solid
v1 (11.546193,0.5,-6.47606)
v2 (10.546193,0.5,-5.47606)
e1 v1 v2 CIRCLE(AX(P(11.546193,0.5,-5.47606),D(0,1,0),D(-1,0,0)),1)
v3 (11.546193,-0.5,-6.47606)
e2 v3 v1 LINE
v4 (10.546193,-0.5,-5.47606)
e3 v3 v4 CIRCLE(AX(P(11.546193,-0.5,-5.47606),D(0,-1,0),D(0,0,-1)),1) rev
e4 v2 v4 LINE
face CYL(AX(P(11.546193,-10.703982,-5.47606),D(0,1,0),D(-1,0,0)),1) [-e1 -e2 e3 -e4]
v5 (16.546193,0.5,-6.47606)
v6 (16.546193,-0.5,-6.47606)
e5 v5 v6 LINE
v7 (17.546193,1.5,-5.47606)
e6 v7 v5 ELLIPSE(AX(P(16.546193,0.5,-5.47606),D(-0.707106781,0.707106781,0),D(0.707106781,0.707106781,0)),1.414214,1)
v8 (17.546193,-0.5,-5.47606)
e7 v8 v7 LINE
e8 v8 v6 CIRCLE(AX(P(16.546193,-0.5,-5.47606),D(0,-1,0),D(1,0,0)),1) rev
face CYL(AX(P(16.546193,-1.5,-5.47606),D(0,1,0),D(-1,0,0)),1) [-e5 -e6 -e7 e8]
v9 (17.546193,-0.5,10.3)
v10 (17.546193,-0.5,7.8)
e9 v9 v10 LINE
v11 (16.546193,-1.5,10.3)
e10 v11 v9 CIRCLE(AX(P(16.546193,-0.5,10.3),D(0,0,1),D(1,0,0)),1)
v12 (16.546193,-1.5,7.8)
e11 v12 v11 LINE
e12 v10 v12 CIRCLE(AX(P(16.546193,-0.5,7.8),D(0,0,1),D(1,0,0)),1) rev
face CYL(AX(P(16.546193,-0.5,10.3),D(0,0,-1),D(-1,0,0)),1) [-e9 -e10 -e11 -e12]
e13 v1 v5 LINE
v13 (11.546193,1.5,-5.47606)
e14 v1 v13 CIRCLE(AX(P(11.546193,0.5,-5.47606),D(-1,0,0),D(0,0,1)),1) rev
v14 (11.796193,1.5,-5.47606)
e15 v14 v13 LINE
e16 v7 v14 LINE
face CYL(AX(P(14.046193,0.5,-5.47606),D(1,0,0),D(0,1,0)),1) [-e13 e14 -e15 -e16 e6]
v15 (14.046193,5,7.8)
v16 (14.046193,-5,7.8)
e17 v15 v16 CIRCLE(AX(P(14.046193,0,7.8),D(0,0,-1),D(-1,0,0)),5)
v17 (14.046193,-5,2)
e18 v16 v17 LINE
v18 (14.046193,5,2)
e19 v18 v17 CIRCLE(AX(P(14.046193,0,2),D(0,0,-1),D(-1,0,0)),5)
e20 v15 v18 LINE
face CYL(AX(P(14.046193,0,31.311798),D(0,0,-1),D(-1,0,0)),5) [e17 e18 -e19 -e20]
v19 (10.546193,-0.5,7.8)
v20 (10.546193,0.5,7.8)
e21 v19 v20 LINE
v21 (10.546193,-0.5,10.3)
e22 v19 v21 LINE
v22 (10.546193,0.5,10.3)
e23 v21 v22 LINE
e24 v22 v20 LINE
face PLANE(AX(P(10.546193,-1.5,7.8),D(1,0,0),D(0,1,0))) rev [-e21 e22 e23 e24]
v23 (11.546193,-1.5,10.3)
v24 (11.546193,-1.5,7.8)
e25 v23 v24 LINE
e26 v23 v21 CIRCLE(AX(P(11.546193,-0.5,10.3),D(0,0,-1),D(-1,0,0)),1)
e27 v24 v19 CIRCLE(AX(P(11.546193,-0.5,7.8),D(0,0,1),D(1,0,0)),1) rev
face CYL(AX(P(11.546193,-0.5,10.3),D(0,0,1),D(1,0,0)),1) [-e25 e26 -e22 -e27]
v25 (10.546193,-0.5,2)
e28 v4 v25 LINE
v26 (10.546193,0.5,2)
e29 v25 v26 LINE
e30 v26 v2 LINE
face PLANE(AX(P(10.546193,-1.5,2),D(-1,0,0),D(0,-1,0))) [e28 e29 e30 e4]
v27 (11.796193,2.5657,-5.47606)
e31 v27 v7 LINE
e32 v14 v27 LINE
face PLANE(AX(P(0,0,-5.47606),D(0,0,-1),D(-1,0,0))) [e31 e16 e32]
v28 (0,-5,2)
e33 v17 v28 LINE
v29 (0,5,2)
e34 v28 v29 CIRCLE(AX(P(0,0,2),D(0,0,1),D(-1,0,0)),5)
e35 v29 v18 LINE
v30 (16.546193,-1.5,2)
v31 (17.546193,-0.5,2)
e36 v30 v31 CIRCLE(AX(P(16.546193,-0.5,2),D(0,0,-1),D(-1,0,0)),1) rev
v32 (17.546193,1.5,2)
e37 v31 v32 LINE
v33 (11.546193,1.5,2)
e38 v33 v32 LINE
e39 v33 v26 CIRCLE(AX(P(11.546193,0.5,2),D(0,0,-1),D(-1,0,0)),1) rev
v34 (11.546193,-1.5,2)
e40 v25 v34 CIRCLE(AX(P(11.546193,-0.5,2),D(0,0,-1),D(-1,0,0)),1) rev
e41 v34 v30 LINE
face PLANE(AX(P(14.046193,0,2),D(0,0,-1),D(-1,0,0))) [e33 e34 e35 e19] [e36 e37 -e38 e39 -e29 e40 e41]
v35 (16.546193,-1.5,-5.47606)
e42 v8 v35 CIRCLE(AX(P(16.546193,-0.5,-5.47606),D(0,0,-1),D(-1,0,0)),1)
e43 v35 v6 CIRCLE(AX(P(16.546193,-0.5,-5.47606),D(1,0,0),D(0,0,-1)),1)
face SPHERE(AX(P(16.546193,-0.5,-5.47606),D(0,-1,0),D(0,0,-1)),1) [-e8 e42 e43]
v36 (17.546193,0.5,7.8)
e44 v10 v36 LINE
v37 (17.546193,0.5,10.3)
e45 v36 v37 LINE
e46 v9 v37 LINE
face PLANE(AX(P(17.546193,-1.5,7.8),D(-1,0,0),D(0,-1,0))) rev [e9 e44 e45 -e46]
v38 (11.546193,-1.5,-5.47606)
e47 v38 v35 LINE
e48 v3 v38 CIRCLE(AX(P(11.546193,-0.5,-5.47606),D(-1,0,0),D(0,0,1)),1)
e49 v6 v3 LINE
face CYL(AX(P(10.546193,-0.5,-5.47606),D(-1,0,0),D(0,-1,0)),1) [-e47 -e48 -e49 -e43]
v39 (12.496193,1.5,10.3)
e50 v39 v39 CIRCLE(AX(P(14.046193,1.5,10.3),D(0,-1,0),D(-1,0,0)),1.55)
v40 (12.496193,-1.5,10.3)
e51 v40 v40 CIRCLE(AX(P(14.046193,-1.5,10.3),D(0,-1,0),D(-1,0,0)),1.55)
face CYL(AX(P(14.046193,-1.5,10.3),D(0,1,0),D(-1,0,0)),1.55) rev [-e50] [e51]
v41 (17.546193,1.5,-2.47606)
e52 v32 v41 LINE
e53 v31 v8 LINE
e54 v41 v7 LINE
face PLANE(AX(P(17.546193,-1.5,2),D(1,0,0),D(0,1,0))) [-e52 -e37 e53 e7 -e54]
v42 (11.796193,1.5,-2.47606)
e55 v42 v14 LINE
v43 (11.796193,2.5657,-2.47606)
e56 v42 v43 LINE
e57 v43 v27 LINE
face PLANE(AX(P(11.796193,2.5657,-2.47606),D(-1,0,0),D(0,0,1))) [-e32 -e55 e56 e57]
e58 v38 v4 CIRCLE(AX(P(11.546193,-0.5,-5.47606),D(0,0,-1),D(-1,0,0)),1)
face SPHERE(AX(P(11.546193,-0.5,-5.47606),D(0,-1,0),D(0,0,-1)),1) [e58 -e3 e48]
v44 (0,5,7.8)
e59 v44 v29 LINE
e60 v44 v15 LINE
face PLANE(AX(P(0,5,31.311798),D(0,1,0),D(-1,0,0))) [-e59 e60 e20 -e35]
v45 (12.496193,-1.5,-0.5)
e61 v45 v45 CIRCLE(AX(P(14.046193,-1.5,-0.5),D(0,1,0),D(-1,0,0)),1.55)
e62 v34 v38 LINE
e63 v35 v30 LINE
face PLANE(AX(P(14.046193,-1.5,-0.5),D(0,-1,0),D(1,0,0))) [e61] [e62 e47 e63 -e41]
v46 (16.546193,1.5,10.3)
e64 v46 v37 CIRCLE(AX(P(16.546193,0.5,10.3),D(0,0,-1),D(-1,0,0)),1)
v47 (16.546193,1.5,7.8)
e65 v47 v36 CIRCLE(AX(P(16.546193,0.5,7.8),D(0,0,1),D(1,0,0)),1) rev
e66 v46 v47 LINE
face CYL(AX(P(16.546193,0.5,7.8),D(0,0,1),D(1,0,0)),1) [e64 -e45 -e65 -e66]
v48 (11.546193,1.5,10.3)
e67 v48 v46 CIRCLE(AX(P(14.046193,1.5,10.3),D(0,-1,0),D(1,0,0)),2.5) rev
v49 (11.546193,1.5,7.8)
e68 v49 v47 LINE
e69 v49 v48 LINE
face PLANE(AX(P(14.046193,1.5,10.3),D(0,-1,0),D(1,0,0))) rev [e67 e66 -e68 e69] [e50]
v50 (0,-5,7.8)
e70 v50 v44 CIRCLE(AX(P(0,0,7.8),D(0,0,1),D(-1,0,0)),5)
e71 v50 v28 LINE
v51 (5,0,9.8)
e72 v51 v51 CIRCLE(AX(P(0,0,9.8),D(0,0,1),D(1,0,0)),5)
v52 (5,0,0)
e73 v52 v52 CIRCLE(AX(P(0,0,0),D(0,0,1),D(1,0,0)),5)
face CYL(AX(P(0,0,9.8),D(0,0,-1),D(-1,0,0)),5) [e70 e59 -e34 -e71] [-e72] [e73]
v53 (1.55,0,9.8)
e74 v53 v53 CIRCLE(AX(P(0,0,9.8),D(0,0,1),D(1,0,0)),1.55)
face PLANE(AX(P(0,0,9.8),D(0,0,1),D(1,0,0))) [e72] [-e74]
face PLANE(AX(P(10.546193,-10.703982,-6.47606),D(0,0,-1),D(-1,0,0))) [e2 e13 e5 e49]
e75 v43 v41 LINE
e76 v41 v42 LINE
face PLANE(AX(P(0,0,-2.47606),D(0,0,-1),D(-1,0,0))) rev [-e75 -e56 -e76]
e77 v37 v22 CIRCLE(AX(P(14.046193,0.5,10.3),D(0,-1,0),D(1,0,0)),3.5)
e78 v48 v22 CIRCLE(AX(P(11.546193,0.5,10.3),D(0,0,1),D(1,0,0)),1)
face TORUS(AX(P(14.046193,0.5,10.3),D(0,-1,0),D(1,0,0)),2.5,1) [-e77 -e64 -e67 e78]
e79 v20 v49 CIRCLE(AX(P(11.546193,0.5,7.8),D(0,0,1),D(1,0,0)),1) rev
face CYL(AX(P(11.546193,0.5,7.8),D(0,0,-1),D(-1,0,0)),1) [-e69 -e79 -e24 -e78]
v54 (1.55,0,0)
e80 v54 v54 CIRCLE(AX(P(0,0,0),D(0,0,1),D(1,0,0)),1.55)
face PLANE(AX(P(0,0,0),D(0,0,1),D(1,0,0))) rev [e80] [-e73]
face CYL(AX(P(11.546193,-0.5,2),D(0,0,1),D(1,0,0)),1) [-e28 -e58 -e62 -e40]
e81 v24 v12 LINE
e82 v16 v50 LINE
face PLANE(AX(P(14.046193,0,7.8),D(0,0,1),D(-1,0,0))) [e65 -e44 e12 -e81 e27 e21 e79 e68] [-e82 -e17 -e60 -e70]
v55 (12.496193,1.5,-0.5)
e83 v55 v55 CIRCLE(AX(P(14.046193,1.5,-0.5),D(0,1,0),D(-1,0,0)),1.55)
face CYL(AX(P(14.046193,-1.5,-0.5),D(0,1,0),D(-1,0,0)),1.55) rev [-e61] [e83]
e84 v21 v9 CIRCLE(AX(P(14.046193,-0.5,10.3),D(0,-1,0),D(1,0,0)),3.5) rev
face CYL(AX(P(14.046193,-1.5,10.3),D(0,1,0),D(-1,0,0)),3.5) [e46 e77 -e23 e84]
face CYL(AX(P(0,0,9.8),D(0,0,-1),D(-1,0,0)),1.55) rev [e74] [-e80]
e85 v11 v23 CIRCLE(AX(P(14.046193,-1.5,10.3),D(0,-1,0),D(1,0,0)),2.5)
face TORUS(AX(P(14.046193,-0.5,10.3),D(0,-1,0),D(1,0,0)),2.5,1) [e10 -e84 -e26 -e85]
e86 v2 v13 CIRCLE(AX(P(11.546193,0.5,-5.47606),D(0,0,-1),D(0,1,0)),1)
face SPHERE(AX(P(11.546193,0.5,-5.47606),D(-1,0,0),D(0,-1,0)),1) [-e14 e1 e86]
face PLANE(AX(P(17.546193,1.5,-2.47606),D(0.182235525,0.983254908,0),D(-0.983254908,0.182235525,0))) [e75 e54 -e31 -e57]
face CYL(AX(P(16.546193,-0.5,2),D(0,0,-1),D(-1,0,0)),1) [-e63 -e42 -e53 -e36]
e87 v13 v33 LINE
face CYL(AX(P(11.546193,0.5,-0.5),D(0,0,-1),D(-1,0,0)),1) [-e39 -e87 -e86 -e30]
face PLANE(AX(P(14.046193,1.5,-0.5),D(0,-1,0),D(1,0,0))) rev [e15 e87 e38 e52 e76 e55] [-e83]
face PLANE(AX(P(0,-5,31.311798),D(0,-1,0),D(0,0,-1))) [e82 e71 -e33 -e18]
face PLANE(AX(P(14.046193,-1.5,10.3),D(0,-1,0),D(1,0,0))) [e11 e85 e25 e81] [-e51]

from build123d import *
from build123d.topology import SkipClean

# Parameters (mm, degrees)
ESQUISSE1_R          = 5
ESQUISSE1_R_2        = 1.55
BOSS_EXTRU_1_DEPTH   = 9.8
BOSS_EXTRUDE7_DEPTH  = 9.8
CUT_EXTRUDE3_DEPTH   = 2
SKETCH14_R           = 1.55
BOSS_EXTRUDE11_DEPTH = 1.5
BOSS_EXTRUDE12_DEPTH = 3
BOSS_EXTRUDE17_START = -1
BOSS_EXTRUDE17_DEPTH = 3
FILLET3_R            = 1
FILLET5_R            = 1


with BuildPart() as part:
    # Esquisse1 → Boss.-Extru.1 (new body)
    with BuildSketch(Plane.XY):
        Circle(ESQUISSE1_R)
        Circle(ESQUISSE1_R_2, mode=Mode.SUBTRACT)
    extrude(amount=BOSS_EXTRU_1_DEPTH)

    # Sketch8 → Boss-Extrude7 (add)
    with BuildSketch(Plane(origin=(0, 0, 0), x_dir=(-1, 0, 0), z_dir=(0, 0, -1))):
        with BuildLine():
            Line((0, 5), (-14.046192928, 5))
            ThreePointArc((-14.046192928, 5), (-19.046192928, 0), (-14.046192928, -5))
            Line((-14.046192928, -5), (0, -5))
            ThreePointArc((0, -5), (-5, 0), (0, 5))
        make_face()
    extrude(amount=-BOSS_EXTRUDE7_DEPTH)

    # Sketch12 → Cut-Extrude3 (cut)
    with SkipClean():  # the faces are left unmerged after this step: merging them gives an invalid solid
        with BuildSketch(Plane(origin=(0, 0, 0), x_dir=(-1, 0, 0), z_dir=(0, 0, -1))):
            with BuildLine():
                Line((-14.046192928, 5), (-7.023096464, 5))
                Line((-7.023096464, 5), (0, 5))
                ThreePointArc((0, 5), (-5, 0), (0, -5))
                Line((0, -5), (-7.023096464, -5))
                Line((-7.023096464, -5), (-14.046192928, -5))
                ThreePointArc((-14.046192928, -5), (-19.046192928, 0), (-14.046192928, 5))
            make_face()
        cut_extrude3 = extrude(amount=-CUT_EXTRUDE3_DEPTH, mode=Mode.SUBTRACT)

    # Mirror3: Cut-Extrude3 across plane
    with SkipClean():  # the faces are left unmerged after this step: merging them gives an invalid solid
        add(cut_extrude3.mirror(Plane.XY.offset(4.9)), mode=Mode.SUBTRACT)

    # Sketch14 → Boss-Extrude11 (add, symmetric)
    with SkipClean():  # the faces are left unmerged after this step: merging them gives an invalid solid
        with BuildSketch(Plane(origin=(0, 0, 0), x_dir=(1, 0, 0), z_dir=(0, 1, 0))):
            with BuildLine():
                Line((10.546192928, -2), (17.546192928, -2))
                Line((17.546192928, -2), (17.546192928, 0.5))
                ThreePointArc((17.546192928, 0.5), (14.046192928, 4), (10.546192928, 0.5))
                Line((10.546192928, 0.5), (10.546192928, -2))
            make_face()
            with Locations(Location((14.046192928, 0.5, 0), (0, 0, 180))):
                Circle(SKETCH14_R, mode=Mode.SUBTRACT)
        boss_extrude11 = extrude(amount=BOSS_EXTRUDE11_DEPTH, both=True)

    # Mirror4: Boss-Extrude11 across plane
    with SkipClean():  # the faces are left unmerged after this step: merging them gives an invalid solid
        add(boss_extrude11.mirror(Plane.XY.offset(4.9)))

    # Sketch15 → Boss-Extrude12 (add)
    with SkipClean():  # the faces are left unmerged after this step: merging them gives an invalid solid
        with BuildSketch(Plane(origin=(0, 1.5, 0), x_dir=(1, 0, 0), z_dir=(0, 1, 0))):
            with BuildLine():
                Line((10.546192928, 0.5), (10.546192928, 6.476059904))
                Line((10.546192928, 6.476059904), (17.546192928, 6.476059904))
                Line((17.546192928, 6.476059904), (17.546192928, 0.5))
                ThreePointArc((17.546192928, 0.5), (14.046192928, 4), (10.546192928, 0.5))
            make_face()
        extrude(amount=-BOSS_EXTRUDE12_DEPTH)

    # Sketch23 → Boss-Extrude17 (add)
    with SkipClean():  # the faces are left unmerged after this step: merging them gives an invalid solid
        with BuildSketch(Plane(origin=(0, 0, -6.476059904), x_dir=(-1, 0, 0), z_dir=(0, 0, -1)).offset(BOSS_EXTRUDE17_START)):
            Polygon((-17.546192928, 1.5), (-11.796192928, 2.565699508), (-11.796192928, 1.5), align=None)
        extrude(amount=-BOSS_EXTRUDE17_DEPTH)

    # Fillet3
    fillet3_edges = [part.edges().sort_by_distance(p)[0] for p in [
        (10.546192928, -1.5, 9.05),
        (17.546192928, -1.5, 9.05),
        (14.046192928, -1.5, 13.8),
        (10.546192928, 1.5, 9.05),
        (17.546192928, 1.5, 9.05),
        (14.046192928, 1.5, 13.8),
    ]]
    fillet(fillet3_edges, radius=FILLET3_R)

    # Fillet5
    fillet5_edges = [part.edges().sort_by_distance(p)[0] for p in [
        (14.046192928, -1.5, -6.476059904),
        (14.046192928, 1.5, -6.476059904),
        (17.546192928, 0, -6.476059904),
        (10.546192928, 0, -6.476059904),
        (10.546192928, 1.5, -2.238029952),
        (10.546192928, -1.5, -2.238029952),
        (17.546192928, -1.5, -2.238029952),
    ]]
    fillet(fillet5_edges, radius=FILLET5_R - 0.0001)  # a hair under: the kernel refuses the full size


solid = part.part
